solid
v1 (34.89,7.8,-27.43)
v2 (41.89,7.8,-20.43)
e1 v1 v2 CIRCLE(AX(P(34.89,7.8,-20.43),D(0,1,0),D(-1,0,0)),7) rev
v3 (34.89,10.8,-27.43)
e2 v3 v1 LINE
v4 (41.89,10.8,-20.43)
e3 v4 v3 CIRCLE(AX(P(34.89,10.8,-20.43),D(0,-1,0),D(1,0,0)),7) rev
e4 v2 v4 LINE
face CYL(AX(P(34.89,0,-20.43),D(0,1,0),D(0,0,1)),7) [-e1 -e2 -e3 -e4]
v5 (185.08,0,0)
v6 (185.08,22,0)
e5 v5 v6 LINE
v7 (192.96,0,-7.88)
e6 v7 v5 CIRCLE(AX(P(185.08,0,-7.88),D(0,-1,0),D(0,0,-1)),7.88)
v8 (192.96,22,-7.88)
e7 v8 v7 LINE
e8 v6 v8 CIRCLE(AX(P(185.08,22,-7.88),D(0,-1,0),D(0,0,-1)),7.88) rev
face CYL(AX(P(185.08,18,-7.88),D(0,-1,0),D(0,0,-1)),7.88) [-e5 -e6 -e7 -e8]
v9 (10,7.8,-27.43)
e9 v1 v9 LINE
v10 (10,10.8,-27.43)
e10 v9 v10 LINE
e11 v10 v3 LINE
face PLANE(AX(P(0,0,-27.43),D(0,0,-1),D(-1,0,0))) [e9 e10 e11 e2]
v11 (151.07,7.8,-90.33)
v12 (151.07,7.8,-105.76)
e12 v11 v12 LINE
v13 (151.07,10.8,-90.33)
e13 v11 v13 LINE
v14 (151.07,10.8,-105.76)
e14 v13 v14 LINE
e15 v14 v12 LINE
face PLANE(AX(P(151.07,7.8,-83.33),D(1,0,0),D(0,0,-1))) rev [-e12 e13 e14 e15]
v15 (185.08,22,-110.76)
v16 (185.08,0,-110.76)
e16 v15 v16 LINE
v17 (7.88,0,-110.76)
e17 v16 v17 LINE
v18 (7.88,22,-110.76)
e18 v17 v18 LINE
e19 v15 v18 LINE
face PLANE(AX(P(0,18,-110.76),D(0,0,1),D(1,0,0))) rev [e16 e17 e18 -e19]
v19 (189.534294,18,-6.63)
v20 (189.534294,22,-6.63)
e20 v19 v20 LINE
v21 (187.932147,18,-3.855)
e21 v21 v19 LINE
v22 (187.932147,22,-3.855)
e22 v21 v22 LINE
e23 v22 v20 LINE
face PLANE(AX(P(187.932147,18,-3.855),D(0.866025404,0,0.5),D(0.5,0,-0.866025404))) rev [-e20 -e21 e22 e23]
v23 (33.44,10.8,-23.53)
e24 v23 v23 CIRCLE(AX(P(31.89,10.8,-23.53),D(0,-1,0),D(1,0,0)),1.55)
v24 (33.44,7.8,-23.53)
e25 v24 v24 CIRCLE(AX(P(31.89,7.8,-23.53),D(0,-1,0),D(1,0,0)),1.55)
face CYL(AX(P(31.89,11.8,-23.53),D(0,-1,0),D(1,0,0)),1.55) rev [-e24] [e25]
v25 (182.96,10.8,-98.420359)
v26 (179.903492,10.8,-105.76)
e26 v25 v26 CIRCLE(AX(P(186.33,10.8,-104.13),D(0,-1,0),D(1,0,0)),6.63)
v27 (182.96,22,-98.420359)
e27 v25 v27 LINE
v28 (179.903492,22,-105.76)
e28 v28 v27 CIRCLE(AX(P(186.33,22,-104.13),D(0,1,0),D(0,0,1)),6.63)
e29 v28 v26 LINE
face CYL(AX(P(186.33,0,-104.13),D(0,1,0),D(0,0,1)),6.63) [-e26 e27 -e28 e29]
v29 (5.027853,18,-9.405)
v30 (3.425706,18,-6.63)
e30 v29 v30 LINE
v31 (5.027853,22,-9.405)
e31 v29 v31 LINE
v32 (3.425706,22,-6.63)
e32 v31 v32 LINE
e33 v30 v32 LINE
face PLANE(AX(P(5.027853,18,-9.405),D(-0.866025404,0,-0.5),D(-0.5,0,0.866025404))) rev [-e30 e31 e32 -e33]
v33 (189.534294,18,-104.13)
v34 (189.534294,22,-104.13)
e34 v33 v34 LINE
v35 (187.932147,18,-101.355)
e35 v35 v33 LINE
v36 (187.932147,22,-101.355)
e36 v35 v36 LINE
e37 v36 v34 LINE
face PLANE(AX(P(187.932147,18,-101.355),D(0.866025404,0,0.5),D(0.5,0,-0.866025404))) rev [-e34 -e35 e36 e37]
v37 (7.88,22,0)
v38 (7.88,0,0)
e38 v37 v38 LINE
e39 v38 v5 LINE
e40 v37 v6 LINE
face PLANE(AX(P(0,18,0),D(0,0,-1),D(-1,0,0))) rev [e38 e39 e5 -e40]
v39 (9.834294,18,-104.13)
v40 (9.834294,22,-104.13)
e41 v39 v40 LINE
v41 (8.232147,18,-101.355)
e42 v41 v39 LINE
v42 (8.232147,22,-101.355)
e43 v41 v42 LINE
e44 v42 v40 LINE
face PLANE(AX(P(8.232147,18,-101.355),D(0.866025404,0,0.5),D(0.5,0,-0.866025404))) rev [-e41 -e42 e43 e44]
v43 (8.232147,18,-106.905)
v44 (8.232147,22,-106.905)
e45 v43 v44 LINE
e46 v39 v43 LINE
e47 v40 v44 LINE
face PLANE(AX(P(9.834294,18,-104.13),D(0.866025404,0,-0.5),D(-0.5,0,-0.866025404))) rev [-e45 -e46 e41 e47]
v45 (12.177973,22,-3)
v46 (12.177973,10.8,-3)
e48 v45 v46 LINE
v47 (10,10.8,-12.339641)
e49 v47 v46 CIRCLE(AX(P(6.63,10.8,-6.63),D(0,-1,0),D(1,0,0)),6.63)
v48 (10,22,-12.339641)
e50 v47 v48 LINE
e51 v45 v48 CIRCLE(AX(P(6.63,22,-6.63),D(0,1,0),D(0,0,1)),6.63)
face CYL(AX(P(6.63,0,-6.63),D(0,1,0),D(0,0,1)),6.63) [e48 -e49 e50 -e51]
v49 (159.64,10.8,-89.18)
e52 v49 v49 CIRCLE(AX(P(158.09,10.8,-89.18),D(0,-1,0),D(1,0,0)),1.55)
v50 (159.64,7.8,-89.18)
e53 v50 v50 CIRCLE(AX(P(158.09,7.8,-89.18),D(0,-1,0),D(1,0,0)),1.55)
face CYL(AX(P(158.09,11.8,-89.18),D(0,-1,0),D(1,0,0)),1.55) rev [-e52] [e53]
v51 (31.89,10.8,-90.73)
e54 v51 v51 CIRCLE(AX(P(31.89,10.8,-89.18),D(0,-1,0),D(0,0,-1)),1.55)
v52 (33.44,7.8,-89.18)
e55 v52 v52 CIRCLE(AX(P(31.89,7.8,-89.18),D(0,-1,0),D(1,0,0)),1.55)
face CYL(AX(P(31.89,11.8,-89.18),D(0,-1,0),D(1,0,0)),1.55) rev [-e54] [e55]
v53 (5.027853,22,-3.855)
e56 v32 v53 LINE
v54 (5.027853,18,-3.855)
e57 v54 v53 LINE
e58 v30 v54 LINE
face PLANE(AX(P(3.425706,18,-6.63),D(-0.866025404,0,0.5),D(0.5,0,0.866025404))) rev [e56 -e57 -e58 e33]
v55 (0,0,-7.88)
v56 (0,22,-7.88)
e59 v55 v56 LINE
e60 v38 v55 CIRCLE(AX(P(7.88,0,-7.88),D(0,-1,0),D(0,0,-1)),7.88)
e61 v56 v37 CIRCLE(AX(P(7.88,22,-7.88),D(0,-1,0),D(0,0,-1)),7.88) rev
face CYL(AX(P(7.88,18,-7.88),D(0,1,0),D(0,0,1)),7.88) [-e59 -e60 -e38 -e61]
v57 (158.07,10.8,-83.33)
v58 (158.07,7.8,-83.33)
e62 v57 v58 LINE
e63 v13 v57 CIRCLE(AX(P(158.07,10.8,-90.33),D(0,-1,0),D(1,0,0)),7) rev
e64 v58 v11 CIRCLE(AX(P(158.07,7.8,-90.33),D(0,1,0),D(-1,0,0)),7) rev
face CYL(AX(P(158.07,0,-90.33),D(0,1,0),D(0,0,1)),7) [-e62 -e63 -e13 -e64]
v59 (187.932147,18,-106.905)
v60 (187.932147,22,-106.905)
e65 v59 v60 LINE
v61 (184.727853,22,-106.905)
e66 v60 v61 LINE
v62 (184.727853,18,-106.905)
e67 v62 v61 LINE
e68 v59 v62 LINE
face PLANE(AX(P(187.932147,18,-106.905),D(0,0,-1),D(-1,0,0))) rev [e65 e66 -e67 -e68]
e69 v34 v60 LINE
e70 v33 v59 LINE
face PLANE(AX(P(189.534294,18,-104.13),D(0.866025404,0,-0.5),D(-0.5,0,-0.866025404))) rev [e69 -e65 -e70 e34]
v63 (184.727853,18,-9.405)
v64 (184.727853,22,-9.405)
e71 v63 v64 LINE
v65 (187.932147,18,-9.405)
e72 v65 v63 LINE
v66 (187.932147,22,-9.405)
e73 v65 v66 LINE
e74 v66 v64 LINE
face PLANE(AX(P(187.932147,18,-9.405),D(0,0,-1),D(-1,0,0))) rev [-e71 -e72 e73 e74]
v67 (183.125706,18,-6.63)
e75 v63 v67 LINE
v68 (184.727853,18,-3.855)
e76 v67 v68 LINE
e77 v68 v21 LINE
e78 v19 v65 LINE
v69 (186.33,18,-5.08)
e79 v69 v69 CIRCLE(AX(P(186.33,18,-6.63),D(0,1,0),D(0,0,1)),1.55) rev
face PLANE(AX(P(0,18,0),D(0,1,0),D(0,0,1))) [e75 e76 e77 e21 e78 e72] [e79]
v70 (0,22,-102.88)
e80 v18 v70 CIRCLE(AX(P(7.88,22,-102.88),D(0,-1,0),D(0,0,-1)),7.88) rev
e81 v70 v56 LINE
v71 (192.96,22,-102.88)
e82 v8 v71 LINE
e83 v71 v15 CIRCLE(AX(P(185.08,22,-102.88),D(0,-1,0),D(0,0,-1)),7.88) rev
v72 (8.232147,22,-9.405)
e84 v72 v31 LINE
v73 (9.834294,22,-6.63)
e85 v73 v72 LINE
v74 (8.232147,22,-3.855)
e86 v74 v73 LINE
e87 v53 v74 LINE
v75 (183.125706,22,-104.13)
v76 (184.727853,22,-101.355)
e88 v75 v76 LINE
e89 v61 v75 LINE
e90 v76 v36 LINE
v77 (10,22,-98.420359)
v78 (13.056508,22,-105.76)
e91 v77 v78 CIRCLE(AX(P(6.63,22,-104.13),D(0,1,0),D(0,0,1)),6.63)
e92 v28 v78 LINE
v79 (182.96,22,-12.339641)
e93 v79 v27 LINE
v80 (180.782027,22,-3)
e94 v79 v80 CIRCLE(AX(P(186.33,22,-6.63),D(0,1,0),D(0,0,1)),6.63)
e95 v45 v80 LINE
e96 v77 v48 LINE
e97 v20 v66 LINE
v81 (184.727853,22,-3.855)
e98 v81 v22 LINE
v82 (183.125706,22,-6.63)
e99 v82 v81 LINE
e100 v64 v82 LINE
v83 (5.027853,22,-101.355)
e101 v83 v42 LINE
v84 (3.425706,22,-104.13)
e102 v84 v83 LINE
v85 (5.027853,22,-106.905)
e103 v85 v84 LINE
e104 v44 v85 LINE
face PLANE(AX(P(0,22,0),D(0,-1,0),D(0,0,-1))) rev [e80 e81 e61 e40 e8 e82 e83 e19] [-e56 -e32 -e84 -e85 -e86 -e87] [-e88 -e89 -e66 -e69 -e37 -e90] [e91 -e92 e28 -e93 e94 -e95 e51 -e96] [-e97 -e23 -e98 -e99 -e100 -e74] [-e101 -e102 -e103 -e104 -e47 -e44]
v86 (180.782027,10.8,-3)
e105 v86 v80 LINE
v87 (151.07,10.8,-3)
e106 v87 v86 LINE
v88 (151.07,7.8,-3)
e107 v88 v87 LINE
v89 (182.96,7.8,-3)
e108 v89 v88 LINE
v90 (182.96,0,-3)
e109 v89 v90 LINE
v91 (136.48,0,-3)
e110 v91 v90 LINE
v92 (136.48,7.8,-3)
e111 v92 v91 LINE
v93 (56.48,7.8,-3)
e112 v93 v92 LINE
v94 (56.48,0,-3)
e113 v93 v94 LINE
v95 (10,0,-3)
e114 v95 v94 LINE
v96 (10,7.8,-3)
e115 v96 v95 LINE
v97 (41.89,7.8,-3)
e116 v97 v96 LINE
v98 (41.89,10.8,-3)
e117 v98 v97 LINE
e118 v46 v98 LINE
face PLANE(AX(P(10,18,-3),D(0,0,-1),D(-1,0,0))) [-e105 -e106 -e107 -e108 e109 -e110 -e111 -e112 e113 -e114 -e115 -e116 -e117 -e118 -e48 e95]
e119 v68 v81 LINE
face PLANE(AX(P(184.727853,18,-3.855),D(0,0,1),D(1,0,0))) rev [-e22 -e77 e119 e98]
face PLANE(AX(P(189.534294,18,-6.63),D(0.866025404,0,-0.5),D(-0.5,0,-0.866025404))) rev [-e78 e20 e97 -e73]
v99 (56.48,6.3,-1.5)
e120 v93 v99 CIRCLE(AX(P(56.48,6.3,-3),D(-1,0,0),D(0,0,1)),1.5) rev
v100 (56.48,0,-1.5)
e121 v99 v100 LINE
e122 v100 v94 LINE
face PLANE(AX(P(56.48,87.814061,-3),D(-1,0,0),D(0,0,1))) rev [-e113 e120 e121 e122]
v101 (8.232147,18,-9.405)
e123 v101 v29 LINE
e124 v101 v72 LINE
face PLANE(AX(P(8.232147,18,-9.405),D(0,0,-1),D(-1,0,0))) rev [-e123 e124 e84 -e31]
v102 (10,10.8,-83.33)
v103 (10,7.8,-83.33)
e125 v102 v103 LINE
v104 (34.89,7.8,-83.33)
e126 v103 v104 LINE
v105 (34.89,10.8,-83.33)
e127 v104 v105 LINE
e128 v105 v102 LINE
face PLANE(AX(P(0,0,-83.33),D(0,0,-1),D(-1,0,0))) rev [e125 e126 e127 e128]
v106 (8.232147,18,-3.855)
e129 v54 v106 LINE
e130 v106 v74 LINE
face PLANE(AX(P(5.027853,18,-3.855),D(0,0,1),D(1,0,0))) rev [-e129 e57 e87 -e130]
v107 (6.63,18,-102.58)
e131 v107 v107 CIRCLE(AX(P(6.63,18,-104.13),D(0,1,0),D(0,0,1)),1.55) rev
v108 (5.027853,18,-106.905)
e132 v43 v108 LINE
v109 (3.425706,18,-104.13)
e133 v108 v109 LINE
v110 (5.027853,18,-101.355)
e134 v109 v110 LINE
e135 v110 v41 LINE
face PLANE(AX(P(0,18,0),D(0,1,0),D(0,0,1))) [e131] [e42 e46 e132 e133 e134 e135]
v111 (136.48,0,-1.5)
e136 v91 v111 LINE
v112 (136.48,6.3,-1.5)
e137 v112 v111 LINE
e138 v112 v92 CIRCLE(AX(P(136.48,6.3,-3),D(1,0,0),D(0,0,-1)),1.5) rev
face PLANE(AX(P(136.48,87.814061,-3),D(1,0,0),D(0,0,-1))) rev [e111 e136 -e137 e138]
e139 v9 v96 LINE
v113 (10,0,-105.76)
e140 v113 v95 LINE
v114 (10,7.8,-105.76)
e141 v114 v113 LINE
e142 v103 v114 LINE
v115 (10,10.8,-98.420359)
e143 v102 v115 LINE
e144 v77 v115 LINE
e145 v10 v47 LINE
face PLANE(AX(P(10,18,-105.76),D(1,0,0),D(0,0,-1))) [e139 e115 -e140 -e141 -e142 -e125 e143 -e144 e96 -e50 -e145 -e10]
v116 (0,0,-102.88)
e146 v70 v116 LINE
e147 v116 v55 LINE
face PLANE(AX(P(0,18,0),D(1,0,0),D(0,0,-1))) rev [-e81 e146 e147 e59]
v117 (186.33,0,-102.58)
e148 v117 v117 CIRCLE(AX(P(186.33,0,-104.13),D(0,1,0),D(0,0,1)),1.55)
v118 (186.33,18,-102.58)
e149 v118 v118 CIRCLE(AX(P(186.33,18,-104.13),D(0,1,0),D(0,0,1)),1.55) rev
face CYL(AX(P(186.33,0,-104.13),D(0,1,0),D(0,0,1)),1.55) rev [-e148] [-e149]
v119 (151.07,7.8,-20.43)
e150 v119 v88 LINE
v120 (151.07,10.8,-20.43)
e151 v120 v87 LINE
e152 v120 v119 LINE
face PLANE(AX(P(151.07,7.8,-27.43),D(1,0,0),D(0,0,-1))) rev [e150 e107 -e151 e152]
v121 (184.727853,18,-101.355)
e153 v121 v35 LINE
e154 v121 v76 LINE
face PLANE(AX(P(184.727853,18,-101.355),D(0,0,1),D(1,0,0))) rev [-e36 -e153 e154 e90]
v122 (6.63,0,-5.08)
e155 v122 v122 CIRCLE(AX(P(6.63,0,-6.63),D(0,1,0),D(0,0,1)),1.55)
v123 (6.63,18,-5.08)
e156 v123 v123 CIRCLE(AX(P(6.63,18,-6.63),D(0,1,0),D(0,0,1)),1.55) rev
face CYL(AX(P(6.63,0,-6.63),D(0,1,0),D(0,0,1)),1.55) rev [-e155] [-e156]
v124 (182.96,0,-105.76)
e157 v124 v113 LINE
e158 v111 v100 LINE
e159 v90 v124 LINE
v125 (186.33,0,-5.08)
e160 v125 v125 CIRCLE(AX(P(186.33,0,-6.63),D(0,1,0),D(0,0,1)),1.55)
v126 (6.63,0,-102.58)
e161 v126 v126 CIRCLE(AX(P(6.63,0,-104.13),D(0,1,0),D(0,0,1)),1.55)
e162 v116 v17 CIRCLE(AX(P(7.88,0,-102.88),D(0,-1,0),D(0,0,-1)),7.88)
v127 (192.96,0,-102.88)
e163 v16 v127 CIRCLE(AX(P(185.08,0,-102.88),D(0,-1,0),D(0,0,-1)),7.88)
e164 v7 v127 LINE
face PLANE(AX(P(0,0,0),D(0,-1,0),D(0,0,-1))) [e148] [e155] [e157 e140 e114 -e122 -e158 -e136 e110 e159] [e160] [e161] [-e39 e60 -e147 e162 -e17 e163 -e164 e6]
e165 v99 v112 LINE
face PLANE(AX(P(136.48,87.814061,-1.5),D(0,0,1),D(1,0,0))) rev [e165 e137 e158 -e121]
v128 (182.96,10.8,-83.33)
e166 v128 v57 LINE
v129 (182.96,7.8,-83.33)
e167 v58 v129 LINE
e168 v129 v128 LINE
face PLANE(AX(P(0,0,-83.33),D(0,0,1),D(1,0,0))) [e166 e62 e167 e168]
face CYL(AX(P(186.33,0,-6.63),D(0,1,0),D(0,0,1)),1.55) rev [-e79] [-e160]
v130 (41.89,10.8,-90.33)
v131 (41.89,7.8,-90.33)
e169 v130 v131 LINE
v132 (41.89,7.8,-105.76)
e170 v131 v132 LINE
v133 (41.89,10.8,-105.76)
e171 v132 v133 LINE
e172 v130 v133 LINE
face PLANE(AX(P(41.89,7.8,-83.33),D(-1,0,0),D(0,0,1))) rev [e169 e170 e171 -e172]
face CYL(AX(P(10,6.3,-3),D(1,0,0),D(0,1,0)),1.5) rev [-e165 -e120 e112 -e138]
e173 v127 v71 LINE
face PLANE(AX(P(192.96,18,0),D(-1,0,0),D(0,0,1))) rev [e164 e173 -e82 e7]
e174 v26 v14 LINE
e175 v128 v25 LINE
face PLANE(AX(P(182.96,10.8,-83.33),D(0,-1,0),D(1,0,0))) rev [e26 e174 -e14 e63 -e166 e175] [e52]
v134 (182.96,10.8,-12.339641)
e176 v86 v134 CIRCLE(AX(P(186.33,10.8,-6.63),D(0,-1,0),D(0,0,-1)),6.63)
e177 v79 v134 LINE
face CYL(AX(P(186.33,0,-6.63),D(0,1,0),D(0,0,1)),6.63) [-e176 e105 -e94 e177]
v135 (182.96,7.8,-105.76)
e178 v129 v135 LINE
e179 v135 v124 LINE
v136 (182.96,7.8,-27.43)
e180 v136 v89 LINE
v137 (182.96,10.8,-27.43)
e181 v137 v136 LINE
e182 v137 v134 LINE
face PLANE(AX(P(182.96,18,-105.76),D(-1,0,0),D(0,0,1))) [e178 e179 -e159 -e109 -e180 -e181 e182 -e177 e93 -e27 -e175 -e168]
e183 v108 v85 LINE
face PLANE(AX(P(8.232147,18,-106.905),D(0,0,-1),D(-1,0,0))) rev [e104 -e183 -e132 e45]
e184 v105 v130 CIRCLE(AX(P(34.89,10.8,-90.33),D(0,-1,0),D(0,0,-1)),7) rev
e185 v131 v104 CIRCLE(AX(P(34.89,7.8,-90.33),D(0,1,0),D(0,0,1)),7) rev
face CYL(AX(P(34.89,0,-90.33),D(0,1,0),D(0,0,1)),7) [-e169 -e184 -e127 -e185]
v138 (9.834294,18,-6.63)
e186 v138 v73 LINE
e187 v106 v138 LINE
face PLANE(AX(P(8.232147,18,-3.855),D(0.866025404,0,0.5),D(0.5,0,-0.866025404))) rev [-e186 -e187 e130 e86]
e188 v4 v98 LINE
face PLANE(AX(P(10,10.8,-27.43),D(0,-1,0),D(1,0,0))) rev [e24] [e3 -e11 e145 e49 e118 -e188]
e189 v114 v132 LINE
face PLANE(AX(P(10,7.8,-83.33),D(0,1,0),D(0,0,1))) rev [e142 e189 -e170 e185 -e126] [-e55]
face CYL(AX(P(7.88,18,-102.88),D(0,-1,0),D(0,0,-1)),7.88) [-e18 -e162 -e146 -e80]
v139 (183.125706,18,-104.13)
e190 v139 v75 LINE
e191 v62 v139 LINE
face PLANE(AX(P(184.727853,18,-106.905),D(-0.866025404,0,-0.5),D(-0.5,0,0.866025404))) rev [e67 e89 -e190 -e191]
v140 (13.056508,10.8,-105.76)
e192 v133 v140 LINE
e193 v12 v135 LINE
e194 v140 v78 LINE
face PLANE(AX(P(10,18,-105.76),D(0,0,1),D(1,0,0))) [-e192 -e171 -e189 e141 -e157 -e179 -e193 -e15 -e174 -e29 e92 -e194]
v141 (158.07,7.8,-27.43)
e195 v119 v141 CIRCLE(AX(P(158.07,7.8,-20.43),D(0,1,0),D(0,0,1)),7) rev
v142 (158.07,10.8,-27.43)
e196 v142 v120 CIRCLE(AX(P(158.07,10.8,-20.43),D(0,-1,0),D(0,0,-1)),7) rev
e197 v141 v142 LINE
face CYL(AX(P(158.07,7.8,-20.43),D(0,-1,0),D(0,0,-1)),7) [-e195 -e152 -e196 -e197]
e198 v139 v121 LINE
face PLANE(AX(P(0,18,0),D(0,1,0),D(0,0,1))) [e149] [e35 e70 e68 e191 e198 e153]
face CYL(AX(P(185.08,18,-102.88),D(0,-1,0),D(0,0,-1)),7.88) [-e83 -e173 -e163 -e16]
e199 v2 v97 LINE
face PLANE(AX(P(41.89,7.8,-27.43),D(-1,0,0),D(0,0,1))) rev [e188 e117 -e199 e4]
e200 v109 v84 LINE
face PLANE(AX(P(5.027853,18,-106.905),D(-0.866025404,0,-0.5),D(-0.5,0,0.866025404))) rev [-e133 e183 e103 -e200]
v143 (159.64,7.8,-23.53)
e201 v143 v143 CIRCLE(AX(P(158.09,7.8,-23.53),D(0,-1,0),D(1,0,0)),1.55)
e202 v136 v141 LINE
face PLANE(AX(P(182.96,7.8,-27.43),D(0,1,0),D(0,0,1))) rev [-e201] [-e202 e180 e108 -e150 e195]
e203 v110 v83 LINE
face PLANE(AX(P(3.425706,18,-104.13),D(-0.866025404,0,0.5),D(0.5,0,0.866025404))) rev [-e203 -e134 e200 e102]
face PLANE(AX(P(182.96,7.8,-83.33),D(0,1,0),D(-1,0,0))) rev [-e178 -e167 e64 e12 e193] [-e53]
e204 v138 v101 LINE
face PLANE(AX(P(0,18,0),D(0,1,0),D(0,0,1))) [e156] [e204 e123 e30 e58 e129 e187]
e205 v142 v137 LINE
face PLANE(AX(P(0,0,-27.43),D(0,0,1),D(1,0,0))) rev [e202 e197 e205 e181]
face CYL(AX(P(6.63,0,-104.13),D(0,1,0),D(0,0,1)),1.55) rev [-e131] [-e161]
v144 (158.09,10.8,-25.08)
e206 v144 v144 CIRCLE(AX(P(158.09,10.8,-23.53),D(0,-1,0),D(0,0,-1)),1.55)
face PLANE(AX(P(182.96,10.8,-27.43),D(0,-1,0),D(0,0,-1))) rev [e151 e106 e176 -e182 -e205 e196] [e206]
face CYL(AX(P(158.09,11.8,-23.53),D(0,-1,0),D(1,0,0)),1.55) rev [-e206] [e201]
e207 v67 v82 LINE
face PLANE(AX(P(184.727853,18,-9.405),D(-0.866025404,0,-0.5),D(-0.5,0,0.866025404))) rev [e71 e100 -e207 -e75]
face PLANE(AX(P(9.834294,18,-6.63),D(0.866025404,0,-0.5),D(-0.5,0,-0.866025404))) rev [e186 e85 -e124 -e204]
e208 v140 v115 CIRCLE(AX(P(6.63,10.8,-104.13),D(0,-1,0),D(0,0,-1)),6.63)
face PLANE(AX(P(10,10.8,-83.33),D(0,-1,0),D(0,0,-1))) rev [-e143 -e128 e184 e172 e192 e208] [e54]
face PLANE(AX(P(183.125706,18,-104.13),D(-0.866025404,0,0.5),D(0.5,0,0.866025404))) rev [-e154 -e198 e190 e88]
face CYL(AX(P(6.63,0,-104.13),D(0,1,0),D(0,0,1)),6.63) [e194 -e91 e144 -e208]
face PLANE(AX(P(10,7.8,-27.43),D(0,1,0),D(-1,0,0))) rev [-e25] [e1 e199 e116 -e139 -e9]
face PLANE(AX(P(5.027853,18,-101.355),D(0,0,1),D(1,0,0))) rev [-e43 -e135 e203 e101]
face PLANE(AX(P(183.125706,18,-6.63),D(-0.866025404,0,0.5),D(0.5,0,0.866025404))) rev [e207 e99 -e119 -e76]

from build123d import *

# Parameters (mm, degrees)
CROQUIS1_W              = 192.96
CROQUIS1_H              = 110.76
CROQUIS1_W_2            = 172.96
CROQUIS1_H_2            = 102.76
SALIENTE_EXTRUIR2_DEPTH = 18
CROQUIS2_W              = 31.89
CROQUIS2_H              = 3
SALIENTE_EXTRUIR3_DEPTH = 24.43
CROQUIS3_W              = 31.89
CROQUIS3_H              = 3
SALIENTE_EXTRUIR4_DEPTH = 22.43
CROQUIS1_2_W            = 192.96
CROQUIS1_2_H            = 110.76
CROQUIS1_2_W_2          = 172.96
CROQUIS1_2_H_2          = 102.76
SALIENTE_EXTRUIR5_DEPTH = 22
CROQUIS6_R              = 6.63
SALIENTE_EXTRUIR6_DEPTH = 22
CROQUIS7_R              = 1.55
CORTAR_EXTRUIR1_DEPTH   = 22
CORTAR_EXTRUIR2_DEPTH   = 4
REDONDEO1_R             = 7.88
REDONDEO2_R             = 7.88
REDONDEO3_R             = 7.88
REDONDEO4_R             = 7.88
CROQUIS9_R              = 1.55
CORTAR_EXTRUIR3_DEPTH   = 4
CROQUIS10_W             = 172.96
CROQUIS10_H             = 102.76
CORTAR_EXTRUIR5_DEPTH   = 7.8
REDONDEO5_R             = 7
REDONDEO6_R             = 7
REDONDEO7_R             = 7
REDONDEO8_R             = 7
CROQUIS11_W             = 80
CROQUIS11_H             = 1.5
CORTAR_EXTRUIR6_DEPTH   = 7.8
REDONDEO9_R             = 1.5


with BuildPart() as part:
    # Croquis1 → Saliente-Extruir2 (new body)
    with BuildSketch(Plane(origin=(0, 0, 0), x_dir=(1, 0, 0), z_dir=(0, 1, 0))):
        with Locations((96.48, 55.38)):
            Rectangle(CROQUIS1_W, CROQUIS1_H)
        with Locations((96.48, 54.38)):
            Rectangle(CROQUIS1_W_2, CROQUIS1_H_2, mode=Mode.SUBTRACT)
    extrude(amount=SALIENTE_EXTRUIR2_DEPTH)

    # Croquis2 → Saliente-Extruir3 (add)
    with BuildSketch(Plane(origin=(0, 0, -3), x_dir=(-1, 0, 0), z_dir=(0, 0, -1))):
        with Locations((-25.945, 9.3)):
            Rectangle(CROQUIS2_W, CROQUIS2_H)
        with Locations((-167.015, 9.3)):
            Rectangle(CROQUIS2_W, CROQUIS2_H)
    extrude(amount=SALIENTE_EXTRUIR3_DEPTH)

    # Croquis3 → Saliente-Extruir4 (add)
    with BuildSketch(Plane.XY.offset(-105.76)):
        with Locations((167.015, 9.3)):
            Rectangle(CROQUIS3_W, CROQUIS3_H)
        with Locations((25.945, 9.3)):
            Rectangle(CROQUIS3_W, CROQUIS3_H)
    extrude(amount=SALIENTE_EXTRUIR4_DEPTH)

    # Croquis1<2> → Saliente-Extruir5 (add)
    with BuildSketch(Plane(origin=(0, 0, 0), x_dir=(1, 0, 0), z_dir=(0, 1, 0))):
        with Locations((96.48, 55.38)):
            Rectangle(CROQUIS1_2_W, CROQUIS1_2_H)
        with Locations((96.48, 54.38)):
            Rectangle(CROQUIS1_2_W_2, CROQUIS1_2_H_2, mode=Mode.SUBTRACT)
    extrude(amount=SALIENTE_EXTRUIR5_DEPTH)

    # Croquis6 → Saliente-Extruir6 (add)
    with BuildSketch(Plane(origin=(0, 22, 0), x_dir=(1, 0, 0), z_dir=(0, 1, 0))):
        with Locations((6.63, 6.63)):
            Circle(CROQUIS6_R)
        with Locations((6.63, 104.13)):
            Circle(CROQUIS6_R)
        with Locations((186.33, 104.13)):
            Circle(CROQUIS6_R)
        with Locations((186.33, 6.63)):
            Circle(CROQUIS6_R)
    extrude(amount=-SALIENTE_EXTRUIR6_DEPTH)

    # Croquis7 → Cortar-Extruir1 (cut)
    with BuildSketch(Plane(origin=(0, 22, 0), x_dir=(1, 0, 0), z_dir=(0, 1, 0))):
        with Locations(Location((6.63, 104.13, 0), (0, 0, 270))):
            Circle(CROQUIS7_R)
        with Locations(Location((186.33, 104.13, 0), (0, 0, 270))):
            Circle(CROQUIS7_R)
        with Locations(Location((186.33, 6.63, 0), (0, 0, 270))):
            Circle(CROQUIS7_R)
        with Locations(Location((6.63, 6.63, 0), (0, 0, 270))):
            Circle(CROQUIS7_R)
    extrude(amount=-CORTAR_EXTRUIR1_DEPTH, mode=Mode.SUBTRACT)

    # Croquis8 → Cortar-Extruir2 (cut)
    with BuildSketch(Plane(origin=(0, 22, 0), x_dir=(1, 0, 0), z_dir=(0, 1, 0))):
        Polygon((189.534293994, 6.63), (187.932146997, 9.405), (184.727853003, 9.405), (183.125706006, 6.63), (184.727853003, 3.855), (187.932146997, 3.855), align=None)
        Polygon((189.534293994, 104.13), (187.932146997, 106.905), (184.727853003, 106.905), (183.125706006, 104.13), (184.727853003, 101.355), (187.932146997, 101.355), align=None)
        Polygon((9.834293994, 6.63), (8.232146997, 9.405), (5.027853003, 9.405), (3.425706006, 6.63), (5.027853003, 3.855), (8.232146997, 3.855), align=None)
        Polygon((9.834293994, 104.13), (8.232146997, 106.905), (5.027853003, 106.905), (3.425706006, 104.13), (5.027853003, 101.355), (8.232146997, 101.355), align=None)
    extrude(amount=-CORTAR_EXTRUIR2_DEPTH, mode=Mode.SUBTRACT)

    # Redondeo1
    redondeo1_edges = [part.edges().sort_by_distance(p)[0] for p in [
        (0, 11, 0),
    ]]
    fillet(redondeo1_edges, radius=REDONDEO1_R)

    # Redondeo2
    redondeo2_edges = [part.edges().sort_by_distance(p)[0] for p in [
        (0, 11, -110.76),
    ]]
    fillet(redondeo2_edges, radius=REDONDEO2_R)

    # Redondeo3
    redondeo3_edges = [part.edges().sort_by_distance(p)[0] for p in [
        (192.96, 11, -110.76),
    ]]
    fillet(redondeo3_edges, radius=REDONDEO3_R)

    # Redondeo4
    redondeo4_edges = [part.edges().sort_by_distance(p)[0] for p in [
        (192.96, 11, 0),
    ]]
    fillet(redondeo4_edges, radius=REDONDEO4_R)

    # Croquis9 → Cortar-Extruir3 (cut)
    with BuildSketch(Plane.XZ.offset(-7.8)):
        with Locations((158.09, -89.18)):
            Circle(CROQUIS9_R)
        with Locations((158.09, -23.53)):
            Circle(CROQUIS9_R)
        with Locations((31.89, -89.18)):
            Circle(CROQUIS9_R)
        with Locations((31.89, -23.53)):
            Circle(CROQUIS9_R)
    extrude(amount=-CORTAR_EXTRUIR3_DEPTH, mode=Mode.SUBTRACT)

    # Croquis10 → Cortar-Extruir5 (cut)
    with BuildSketch(Plane.XZ):
        with Locations((96.48, -54.38)):
            Rectangle(CROQUIS10_W, CROQUIS10_H)
    extrude(amount=-CORTAR_EXTRUIR5_DEPTH, mode=Mode.SUBTRACT)

    # Redondeo5
    redondeo5_edges = [part.edges().sort_by_distance(p)[0] for p in [
        (151.07, 9.3, -27.43),
    ]]
    fillet(redondeo5_edges, radius=REDONDEO5_R)

    # Redondeo6
    redondeo6_edges = [part.edges().sort_by_distance(p)[0] for p in [
        (151.07, 9.3, -83.33),
    ]]
    fillet(redondeo6_edges, radius=REDONDEO6_R)

    # Redondeo7
    redondeo7_edges = [part.edges().sort_by_distance(p)[0] for p in [
        (41.89, 9.3, -83.33),
    ]]
    fillet(redondeo7_edges, radius=REDONDEO7_R)

    # Redondeo8
    redondeo8_edges = [part.edges().sort_by_distance(p)[0] for p in [
        (41.89, 9.3, -27.43),
    ]]
    fillet(redondeo8_edges, radius=REDONDEO8_R)

    # Croquis11 → Cortar-Extruir6 (cut)
    with BuildSketch(Plane(origin=(0, 0, 0), x_dir=(-1, 0, 0), z_dir=(0, -1, 0))):
        with Locations((-96.48, 2.25)):
            Rectangle(CROQUIS11_W, CROQUIS11_H)
    extrude(amount=-CORTAR_EXTRUIR6_DEPTH, mode=Mode.SUBTRACT)

    # Redondeo9
    redondeo9_edges = [part.edges().sort_by_distance(p)[0] for p in [
        (96.48, 7.8, -1.5),
    ]]
    fillet(redondeo9_edges, radius=REDONDEO9_R - 0.0001)  # a hair under: the kernel refuses the full size


solid = part.part
